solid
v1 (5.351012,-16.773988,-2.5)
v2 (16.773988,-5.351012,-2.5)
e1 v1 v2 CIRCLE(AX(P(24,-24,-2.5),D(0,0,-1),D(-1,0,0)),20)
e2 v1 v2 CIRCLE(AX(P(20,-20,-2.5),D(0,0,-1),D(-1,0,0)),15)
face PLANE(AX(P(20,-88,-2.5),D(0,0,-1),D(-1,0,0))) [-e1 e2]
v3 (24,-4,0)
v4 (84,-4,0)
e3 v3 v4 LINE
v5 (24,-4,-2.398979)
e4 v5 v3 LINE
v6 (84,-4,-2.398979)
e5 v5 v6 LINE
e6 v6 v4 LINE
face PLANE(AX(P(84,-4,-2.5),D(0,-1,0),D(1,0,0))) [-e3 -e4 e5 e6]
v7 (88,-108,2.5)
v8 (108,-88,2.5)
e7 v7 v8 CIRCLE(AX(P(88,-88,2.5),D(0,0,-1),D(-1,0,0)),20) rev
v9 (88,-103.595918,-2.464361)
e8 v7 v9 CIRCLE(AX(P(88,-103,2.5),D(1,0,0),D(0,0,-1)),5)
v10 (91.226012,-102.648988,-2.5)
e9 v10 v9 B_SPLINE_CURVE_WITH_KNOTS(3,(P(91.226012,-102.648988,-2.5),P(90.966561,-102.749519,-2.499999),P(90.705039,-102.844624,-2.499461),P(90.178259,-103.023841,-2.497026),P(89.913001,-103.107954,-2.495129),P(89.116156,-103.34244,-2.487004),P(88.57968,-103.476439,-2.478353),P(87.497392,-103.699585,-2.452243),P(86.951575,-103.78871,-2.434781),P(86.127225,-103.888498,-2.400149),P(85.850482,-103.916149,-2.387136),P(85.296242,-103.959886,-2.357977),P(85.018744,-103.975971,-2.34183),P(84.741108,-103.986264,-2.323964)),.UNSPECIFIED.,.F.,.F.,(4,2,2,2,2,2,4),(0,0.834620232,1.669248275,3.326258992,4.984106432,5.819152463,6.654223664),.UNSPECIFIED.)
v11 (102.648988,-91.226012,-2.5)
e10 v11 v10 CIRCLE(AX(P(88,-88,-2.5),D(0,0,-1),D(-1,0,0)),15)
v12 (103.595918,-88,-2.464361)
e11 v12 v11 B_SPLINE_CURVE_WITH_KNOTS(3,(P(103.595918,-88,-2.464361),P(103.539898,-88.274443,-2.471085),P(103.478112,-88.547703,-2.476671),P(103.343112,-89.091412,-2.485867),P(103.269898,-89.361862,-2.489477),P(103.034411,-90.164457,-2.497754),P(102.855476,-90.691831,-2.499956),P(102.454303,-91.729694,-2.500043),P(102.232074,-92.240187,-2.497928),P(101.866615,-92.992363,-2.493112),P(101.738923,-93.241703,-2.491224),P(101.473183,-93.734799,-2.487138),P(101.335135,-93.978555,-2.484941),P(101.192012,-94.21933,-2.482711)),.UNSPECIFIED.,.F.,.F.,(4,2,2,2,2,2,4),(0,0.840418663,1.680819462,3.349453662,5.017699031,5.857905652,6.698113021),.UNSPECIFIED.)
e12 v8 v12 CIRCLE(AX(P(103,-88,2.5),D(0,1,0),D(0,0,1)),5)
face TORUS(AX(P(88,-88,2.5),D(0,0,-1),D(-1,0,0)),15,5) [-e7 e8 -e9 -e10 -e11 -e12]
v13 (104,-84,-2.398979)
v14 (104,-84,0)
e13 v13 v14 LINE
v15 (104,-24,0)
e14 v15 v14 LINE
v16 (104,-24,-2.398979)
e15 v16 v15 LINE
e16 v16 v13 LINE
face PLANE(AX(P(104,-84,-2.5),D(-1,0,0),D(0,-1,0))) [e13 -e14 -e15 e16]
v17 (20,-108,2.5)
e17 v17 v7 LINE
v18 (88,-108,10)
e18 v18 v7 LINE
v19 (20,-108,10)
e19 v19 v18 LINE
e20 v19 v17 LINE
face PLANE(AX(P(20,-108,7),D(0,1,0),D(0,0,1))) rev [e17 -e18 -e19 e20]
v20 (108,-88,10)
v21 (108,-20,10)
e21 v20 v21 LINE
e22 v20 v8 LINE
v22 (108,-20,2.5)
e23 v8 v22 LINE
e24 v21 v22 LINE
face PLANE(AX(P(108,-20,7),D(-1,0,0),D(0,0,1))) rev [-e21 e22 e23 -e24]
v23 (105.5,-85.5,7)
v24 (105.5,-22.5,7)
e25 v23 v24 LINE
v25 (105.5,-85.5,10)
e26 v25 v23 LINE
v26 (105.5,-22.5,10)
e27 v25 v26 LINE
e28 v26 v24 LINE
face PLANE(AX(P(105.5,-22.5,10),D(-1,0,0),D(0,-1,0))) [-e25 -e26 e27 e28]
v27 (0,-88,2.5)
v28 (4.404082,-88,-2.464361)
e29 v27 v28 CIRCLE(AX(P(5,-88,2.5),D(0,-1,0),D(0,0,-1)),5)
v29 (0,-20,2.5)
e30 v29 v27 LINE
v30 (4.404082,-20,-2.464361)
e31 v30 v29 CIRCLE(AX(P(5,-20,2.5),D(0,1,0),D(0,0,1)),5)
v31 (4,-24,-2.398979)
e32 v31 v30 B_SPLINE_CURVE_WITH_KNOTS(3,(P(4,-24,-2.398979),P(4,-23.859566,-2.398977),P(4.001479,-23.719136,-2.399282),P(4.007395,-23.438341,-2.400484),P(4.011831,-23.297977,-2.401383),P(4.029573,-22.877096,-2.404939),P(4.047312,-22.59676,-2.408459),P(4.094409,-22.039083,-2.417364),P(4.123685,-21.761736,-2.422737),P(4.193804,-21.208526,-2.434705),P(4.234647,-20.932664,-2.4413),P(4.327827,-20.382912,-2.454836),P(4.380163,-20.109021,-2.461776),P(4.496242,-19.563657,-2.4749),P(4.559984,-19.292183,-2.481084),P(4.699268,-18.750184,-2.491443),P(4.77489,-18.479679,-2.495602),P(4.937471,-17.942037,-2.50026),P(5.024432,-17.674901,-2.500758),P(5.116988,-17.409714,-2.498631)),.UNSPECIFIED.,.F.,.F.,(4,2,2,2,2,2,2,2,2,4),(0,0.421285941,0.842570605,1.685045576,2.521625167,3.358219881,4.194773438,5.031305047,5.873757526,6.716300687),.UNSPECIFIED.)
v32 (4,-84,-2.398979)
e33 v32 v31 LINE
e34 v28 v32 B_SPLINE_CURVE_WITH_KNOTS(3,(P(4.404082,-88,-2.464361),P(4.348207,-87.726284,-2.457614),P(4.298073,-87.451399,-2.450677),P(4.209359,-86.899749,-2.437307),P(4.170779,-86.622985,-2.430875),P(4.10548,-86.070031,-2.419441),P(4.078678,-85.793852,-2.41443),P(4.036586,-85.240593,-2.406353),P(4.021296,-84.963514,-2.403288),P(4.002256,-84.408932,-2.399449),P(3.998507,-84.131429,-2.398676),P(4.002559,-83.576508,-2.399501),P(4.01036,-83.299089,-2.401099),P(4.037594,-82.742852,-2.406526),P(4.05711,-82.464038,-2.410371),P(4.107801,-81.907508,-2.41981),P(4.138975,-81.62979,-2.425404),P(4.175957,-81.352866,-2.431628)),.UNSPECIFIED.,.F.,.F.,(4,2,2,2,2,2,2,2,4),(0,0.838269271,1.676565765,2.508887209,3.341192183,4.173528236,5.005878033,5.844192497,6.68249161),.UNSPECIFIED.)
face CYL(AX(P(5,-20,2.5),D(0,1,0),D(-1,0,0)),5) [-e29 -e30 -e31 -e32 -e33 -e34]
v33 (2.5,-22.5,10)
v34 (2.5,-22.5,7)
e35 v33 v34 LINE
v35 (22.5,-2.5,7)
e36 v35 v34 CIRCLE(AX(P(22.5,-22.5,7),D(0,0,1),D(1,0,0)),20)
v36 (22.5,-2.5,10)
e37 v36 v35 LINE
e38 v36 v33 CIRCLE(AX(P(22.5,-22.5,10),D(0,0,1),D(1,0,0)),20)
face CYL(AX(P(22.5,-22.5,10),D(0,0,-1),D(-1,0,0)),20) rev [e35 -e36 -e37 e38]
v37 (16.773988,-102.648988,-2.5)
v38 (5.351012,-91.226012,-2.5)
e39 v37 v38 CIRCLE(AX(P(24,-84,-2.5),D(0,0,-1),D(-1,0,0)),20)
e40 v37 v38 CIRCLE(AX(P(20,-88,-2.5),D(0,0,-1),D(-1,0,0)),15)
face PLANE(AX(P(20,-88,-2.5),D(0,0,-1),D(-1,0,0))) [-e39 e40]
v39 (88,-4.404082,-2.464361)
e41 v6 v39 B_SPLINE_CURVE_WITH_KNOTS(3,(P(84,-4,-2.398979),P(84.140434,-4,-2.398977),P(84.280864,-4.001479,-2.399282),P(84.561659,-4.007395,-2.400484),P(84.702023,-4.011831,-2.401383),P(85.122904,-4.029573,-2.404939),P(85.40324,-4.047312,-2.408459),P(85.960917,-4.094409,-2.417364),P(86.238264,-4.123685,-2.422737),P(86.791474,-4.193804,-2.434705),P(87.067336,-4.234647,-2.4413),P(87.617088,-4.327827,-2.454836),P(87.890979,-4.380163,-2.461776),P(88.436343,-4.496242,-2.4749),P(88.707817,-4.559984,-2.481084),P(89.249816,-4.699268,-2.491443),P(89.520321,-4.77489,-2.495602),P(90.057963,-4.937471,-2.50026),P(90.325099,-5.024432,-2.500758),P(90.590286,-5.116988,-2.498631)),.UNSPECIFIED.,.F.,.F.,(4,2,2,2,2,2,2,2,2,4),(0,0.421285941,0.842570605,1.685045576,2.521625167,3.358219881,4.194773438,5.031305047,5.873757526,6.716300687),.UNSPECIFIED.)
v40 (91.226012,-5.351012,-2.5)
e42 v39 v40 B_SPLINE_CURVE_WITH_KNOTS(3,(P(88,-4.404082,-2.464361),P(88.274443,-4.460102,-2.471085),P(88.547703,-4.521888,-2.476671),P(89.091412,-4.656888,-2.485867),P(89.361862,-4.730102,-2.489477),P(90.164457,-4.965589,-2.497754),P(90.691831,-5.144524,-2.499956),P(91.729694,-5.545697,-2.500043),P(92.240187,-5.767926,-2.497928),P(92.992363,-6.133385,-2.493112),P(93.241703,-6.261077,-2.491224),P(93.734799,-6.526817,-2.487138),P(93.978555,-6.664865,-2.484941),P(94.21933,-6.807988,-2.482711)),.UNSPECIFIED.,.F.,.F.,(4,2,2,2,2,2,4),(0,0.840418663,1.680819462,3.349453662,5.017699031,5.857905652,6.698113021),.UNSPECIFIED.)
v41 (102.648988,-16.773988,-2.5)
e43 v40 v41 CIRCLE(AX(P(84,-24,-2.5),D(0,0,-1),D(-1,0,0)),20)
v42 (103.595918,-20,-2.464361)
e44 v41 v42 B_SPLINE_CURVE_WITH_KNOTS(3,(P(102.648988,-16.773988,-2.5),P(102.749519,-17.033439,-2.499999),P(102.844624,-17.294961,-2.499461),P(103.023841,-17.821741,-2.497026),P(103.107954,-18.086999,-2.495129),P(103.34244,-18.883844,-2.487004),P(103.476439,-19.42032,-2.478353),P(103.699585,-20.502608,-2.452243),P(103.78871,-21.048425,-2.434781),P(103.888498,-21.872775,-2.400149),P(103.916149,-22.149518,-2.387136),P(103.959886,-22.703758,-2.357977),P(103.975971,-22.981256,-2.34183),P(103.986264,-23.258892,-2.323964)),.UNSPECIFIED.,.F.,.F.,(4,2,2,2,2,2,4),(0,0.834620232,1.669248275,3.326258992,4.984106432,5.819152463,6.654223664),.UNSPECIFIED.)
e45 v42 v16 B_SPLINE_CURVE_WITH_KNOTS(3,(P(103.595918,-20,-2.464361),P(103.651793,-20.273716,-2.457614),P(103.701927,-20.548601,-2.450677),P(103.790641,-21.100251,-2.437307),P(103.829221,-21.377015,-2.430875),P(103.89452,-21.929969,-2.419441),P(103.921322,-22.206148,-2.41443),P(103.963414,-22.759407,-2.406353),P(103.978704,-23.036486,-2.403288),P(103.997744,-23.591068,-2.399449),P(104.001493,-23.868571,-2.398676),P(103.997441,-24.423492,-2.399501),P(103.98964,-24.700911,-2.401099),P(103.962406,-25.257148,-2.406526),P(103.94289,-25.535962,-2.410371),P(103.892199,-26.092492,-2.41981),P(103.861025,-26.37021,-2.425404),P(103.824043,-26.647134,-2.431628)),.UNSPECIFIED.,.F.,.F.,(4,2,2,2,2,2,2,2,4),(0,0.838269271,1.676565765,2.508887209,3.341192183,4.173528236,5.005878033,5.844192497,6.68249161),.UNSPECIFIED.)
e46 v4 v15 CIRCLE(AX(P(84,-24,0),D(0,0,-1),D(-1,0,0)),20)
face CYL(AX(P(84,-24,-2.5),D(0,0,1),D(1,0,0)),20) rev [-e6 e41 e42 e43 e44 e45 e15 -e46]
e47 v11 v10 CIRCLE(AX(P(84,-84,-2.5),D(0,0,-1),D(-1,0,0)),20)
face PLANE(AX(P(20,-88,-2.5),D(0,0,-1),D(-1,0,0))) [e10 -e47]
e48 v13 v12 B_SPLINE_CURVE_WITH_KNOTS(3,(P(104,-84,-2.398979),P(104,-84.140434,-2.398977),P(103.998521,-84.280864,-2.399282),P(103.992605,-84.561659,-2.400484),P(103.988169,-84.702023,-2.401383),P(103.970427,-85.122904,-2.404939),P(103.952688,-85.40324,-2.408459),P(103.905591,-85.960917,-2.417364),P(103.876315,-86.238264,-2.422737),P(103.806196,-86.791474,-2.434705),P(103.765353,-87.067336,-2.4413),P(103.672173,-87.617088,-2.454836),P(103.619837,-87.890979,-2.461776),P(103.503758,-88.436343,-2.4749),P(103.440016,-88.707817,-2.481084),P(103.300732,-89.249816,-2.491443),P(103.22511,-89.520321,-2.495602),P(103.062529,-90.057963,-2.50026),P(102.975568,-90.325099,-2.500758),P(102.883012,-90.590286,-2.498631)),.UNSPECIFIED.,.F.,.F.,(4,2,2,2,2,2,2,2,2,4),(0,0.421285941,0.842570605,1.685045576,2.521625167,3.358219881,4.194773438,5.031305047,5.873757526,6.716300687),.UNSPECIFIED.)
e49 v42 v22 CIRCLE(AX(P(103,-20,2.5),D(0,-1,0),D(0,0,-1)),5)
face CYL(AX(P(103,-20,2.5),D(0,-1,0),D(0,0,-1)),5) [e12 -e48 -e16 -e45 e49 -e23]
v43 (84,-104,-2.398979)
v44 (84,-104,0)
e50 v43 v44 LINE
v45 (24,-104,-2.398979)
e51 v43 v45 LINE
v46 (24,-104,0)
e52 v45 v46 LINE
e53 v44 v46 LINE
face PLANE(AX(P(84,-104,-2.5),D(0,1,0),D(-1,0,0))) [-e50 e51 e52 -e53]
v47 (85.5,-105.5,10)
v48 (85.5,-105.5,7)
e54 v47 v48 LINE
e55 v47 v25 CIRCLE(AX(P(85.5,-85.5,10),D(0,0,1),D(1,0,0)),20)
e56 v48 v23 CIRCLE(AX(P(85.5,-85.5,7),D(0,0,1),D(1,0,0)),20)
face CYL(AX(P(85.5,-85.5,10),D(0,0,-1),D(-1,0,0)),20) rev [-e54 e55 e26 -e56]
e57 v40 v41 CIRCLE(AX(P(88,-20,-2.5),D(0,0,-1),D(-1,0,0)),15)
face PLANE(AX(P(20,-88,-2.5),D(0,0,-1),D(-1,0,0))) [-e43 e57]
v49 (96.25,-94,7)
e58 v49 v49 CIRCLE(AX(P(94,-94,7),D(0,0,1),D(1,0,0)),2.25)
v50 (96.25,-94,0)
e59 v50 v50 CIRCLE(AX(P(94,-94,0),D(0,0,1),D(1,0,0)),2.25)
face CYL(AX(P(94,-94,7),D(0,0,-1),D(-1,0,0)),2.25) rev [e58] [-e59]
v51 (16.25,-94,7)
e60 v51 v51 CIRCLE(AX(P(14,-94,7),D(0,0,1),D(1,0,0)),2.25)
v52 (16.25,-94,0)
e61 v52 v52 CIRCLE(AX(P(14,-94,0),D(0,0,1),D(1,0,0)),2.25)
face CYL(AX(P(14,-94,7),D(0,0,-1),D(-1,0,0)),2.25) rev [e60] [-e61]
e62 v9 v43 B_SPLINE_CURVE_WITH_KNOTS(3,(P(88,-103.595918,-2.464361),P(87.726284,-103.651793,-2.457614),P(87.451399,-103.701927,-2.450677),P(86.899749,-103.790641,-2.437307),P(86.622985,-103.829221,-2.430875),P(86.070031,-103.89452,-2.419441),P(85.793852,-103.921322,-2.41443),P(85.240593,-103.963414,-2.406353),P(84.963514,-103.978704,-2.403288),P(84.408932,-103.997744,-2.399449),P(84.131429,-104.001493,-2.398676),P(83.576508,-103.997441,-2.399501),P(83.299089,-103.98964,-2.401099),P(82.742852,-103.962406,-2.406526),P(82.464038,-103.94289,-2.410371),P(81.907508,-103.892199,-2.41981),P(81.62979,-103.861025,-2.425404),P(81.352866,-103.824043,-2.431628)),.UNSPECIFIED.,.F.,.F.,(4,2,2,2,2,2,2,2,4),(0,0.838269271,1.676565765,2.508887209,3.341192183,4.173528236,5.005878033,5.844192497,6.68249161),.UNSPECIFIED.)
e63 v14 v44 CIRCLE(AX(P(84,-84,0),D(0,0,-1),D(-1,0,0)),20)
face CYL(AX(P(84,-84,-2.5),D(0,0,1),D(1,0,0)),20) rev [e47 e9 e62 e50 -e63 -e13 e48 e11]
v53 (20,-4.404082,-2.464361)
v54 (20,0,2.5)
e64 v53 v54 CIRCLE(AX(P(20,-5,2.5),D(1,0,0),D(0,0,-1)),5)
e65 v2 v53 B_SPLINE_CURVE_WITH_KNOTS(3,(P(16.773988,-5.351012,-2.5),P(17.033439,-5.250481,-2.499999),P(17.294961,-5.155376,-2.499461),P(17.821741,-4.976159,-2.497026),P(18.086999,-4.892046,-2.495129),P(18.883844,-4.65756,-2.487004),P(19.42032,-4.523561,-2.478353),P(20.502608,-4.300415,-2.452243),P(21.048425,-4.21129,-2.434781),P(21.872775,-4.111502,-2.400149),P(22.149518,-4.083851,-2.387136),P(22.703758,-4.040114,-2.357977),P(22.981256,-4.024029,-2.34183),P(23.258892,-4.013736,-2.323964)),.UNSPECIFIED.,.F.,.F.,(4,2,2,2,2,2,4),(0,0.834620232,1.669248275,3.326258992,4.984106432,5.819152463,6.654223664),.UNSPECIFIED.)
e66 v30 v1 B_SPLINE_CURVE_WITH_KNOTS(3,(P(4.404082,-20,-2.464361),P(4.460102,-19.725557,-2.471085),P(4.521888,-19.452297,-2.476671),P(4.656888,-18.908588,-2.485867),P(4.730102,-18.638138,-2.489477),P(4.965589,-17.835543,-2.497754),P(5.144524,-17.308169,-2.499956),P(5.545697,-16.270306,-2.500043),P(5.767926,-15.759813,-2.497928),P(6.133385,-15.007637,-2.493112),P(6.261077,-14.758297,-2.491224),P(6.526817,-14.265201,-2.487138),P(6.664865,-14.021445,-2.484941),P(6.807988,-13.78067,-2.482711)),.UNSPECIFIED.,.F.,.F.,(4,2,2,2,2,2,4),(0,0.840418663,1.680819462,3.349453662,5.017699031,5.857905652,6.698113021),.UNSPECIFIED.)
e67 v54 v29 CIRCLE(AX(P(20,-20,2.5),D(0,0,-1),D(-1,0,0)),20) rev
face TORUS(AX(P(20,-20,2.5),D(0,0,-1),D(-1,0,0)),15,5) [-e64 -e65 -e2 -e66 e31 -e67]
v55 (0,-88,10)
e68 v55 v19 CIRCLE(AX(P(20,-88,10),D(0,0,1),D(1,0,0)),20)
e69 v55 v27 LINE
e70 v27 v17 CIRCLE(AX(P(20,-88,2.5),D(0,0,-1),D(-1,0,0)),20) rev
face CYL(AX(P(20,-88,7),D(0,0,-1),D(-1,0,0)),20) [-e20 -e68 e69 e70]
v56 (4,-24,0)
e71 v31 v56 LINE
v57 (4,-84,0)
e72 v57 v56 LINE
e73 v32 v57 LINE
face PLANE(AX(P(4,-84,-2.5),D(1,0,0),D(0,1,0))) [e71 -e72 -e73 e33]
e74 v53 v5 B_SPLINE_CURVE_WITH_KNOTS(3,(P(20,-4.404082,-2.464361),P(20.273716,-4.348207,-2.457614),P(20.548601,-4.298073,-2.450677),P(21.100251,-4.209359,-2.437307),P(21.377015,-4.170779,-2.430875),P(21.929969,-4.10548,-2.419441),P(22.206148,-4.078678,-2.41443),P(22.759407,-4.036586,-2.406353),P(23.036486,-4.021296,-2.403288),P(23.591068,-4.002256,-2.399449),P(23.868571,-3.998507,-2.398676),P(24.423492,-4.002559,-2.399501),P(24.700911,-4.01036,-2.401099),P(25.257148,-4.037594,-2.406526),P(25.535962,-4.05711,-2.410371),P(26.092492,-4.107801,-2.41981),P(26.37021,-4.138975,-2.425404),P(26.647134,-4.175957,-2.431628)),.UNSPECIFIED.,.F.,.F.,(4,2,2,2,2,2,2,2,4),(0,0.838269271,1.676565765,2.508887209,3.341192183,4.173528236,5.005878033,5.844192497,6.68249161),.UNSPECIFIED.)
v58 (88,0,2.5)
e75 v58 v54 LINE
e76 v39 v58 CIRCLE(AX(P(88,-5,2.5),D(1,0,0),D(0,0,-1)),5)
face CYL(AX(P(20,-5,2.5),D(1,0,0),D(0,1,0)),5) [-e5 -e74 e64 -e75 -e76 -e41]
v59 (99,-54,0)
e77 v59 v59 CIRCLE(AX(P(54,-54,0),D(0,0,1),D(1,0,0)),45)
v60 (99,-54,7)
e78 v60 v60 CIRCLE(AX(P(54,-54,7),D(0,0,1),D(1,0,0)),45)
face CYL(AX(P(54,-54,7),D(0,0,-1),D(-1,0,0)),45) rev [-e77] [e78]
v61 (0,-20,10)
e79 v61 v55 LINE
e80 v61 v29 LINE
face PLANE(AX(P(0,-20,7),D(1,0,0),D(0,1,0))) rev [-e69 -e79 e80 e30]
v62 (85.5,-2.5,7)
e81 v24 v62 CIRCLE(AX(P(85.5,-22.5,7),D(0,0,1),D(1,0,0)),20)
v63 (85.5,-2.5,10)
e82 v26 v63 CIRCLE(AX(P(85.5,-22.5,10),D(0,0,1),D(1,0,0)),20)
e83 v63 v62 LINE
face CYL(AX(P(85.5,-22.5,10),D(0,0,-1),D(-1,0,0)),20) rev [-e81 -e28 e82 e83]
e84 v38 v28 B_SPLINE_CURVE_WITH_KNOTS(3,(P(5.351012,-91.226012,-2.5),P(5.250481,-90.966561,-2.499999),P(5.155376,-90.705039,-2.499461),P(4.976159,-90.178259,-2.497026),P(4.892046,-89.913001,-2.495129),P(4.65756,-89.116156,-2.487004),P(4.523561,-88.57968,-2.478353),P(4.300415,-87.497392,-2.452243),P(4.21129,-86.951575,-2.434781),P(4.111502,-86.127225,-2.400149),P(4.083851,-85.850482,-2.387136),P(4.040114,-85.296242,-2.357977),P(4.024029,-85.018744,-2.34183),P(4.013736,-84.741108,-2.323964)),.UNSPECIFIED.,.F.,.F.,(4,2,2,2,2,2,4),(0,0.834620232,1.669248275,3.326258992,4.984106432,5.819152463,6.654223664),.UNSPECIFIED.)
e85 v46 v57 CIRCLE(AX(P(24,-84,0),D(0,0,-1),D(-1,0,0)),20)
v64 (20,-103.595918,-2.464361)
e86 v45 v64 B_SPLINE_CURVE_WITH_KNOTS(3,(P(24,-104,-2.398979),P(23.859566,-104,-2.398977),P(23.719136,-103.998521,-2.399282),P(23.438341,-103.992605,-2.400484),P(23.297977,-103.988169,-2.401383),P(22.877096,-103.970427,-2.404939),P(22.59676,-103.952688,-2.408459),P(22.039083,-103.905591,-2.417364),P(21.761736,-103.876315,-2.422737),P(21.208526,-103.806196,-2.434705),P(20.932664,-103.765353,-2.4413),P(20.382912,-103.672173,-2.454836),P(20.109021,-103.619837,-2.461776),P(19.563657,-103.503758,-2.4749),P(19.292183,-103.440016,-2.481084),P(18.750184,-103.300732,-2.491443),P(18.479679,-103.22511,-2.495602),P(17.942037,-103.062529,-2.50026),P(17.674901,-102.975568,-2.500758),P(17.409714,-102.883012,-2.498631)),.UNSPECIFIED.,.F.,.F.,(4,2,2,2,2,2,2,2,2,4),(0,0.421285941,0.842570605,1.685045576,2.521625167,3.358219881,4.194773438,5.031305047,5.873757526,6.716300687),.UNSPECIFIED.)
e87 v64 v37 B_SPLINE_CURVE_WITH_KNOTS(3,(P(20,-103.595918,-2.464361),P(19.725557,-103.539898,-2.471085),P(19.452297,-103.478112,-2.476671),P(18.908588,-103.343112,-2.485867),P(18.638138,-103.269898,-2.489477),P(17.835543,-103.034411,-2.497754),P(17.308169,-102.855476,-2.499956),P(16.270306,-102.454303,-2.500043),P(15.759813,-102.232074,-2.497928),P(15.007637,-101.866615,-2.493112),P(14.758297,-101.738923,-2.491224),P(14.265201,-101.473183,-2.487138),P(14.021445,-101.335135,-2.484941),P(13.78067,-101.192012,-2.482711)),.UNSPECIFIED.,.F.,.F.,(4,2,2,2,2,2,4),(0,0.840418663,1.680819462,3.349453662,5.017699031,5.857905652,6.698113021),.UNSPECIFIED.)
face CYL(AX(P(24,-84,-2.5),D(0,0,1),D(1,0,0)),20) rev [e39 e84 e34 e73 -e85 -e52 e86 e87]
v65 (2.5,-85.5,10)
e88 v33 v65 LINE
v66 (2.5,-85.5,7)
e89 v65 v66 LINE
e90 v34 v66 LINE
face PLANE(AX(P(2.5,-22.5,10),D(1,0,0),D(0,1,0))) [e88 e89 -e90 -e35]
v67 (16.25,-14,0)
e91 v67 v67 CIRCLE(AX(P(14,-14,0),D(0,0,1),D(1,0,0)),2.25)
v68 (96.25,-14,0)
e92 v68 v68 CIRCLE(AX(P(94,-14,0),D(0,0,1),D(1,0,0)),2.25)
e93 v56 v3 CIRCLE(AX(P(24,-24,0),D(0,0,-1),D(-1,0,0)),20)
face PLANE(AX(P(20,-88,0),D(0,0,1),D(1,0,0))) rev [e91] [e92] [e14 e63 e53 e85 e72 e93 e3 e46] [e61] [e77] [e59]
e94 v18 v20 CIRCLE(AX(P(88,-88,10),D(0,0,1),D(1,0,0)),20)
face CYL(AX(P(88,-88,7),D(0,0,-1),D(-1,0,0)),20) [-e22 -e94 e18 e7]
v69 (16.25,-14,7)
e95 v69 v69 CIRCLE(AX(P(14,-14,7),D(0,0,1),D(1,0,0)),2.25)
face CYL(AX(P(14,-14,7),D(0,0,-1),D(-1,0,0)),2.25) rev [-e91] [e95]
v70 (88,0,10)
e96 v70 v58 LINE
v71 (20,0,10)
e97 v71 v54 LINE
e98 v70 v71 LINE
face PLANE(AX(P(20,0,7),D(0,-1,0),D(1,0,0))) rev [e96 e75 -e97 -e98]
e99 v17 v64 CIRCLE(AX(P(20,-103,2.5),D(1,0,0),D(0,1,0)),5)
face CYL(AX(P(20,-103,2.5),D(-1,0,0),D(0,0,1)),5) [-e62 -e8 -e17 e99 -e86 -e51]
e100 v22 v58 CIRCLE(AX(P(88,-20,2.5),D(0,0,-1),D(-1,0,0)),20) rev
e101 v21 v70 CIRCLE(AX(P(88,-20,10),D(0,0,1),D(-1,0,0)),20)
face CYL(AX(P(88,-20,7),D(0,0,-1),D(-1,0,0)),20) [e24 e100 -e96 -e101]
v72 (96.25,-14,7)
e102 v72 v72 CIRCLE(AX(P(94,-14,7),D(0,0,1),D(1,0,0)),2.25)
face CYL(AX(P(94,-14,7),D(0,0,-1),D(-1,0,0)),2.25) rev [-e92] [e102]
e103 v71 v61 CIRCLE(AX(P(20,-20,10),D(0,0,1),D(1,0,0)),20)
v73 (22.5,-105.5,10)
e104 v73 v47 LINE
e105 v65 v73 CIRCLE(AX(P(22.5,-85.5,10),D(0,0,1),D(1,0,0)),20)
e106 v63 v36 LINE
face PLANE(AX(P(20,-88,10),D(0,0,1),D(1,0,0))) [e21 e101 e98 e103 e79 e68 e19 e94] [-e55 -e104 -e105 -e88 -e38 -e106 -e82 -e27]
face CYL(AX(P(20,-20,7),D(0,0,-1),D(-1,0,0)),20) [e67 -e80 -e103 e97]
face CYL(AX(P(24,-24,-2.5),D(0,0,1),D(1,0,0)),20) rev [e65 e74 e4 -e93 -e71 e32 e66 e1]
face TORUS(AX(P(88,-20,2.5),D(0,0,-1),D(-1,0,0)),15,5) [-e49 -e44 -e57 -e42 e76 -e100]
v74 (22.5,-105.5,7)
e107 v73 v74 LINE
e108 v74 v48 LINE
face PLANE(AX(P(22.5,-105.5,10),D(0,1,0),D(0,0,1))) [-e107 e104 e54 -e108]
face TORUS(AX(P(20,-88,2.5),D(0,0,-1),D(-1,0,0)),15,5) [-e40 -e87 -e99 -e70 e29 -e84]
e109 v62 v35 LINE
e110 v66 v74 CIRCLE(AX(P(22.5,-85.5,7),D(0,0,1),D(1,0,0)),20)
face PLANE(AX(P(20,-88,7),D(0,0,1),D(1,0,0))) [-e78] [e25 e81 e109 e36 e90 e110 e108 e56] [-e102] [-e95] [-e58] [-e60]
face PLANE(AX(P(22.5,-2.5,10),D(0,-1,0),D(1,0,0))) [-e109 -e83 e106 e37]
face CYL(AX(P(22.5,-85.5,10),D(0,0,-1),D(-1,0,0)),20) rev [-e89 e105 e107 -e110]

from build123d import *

# Parameters (mm, degrees)
ESQUISSE1_R        = 45
ESQUISSE1_R_2      = 2.25
BOSS_EXTRU_1_DEPTH = 7
BOSS_EXTRU_2_DEPTH = 3
BOSS_EXTRU_3_START = 2.5
BOSS_EXTRU_3_DEPTH = 2.5
CONG_1_R           = 5


with BuildPart() as part:
    # Esquisse1 → Boss.-Extru.1 (new body)
    with BuildSketch(Plane.XY):
        with BuildLine():
            Line((20, 0), (88, 0))
            ThreePointArc((88, 0), (102.142135624, -5.857864376), (108, -20))
            Line((108, -20), (108, -88))
            ThreePointArc((108, -88), (102.142135624, -102.142135624), (88, -108))
            Line((88, -108), (20, -108))
            ThreePointArc((20, -108), (5.857864376, -102.142135624), (0, -88))
            Line((0, -88), (0, -20))
            ThreePointArc((0, -20), (5.857864376, -5.857864376), (20, 0))
        make_face()
        with Locations((54, -54)):
            Circle(ESQUISSE1_R, mode=Mode.SUBTRACT)
        with Locations((14, -14)):
            Circle(ESQUISSE1_R_2, mode=Mode.SUBTRACT)
        with Locations((94, -14)):
            Circle(ESQUISSE1_R_2, mode=Mode.SUBTRACT)
        with Locations((94, -94)):
            Circle(ESQUISSE1_R_2, mode=Mode.SUBTRACT)
        with Locations((14, -94)):
            Circle(ESQUISSE1_R_2, mode=Mode.SUBTRACT)
    extrude(amount=BOSS_EXTRU_1_DEPTH)

    # Esquisse2 → Boss.-Extru.2 (add)
    with BuildSketch(Plane.XY.offset(7)):
        with BuildLine():
            Line((20, 0), (88, 0))
            ThreePointArc((88, 0), (102.142135624, -5.857864376), (108, -20))
            Line((108, -20), (108, -88))
            ThreePointArc((108, -88), (102.142135624, -102.142135624), (88, -108))
            Line((88, -108), (20, -108))
            ThreePointArc((20, -108), (5.857864376, -102.142135624), (0, -88))
            Line((0, -88), (0, -20))
            ThreePointArc((0, -20), (5.857864376, -5.857864376), (20, 0))
        make_face()
        with BuildLine():
            Line((22.5, -2.5), (85.5, -2.5))
            ThreePointArc((85.5, -2.5), (99.642135624, -8.357864376), (105.5, -22.5))
            Line((105.5, -22.5), (105.5, -85.5))
            ThreePointArc((105.5, -85.5), (99.642135624, -99.642135624), (85.5, -105.5))
            Line((85.5, -105.5), (22.5, -105.5))
            ThreePointArc((22.5, -105.5), (8.357864376, -99.642135624), (2.5, -85.5))
            Line((2.5, -85.5), (2.5, -22.5))
            ThreePointArc((2.5, -22.5), (8.357864376, -8.357864376), (22.5, -2.5))
        make_face(mode=Mode.SUBTRACT)
    extrude(amount=BOSS_EXTRU_2_DEPTH)

    # Esquisse3 → Boss.-Extru.3 (add)
    with BuildSketch(Plane(origin=(0, 0, 0), x_dir=(-1, 0, 0), z_dir=(0, 0, -1)).offset(BOSS_EXTRU_3_START)):
        with BuildLine():
            Line((-20, 0), (-88, 0))
            ThreePointArc((-88, 0), (-102.142135624, -5.857864376), (-108, -20))
            Line((-108, -20), (-108, -88))
            ThreePointArc((-108, -88), (-102.142135624, -102.142135624), (-88, -108))
            Line((-88, -108), (-20, -108))
            ThreePointArc((-20, -108), (-5.857864376, -102.142135624), (0, -88))
            Line((0, -88), (0, -20))
            ThreePointArc((0, -20), (-5.857864376, -5.857864376), (-20, 0))
        make_face()
        with BuildLine():
            Line((-84, -104), (-24, -104))
            ThreePointArc((-24, -104), (-9.857864376, -98.142135624), (-4, -84))
            Line((-4, -84), (-4, -24))
            ThreePointArc((-4, -24), (-9.857864376, -9.857864376), (-24, -4))
            Line((-24, -4), (-84, -4))
            ThreePointArc((-84, -4), (-98.142135624, -9.857864376), (-104, -24))
            Line((-104, -24), (-104, -84))
            ThreePointArc((-104, -84), (-98.142135624, -98.142135624), (-84, -104))
        make_face(mode=Mode.SUBTRACT)
    extrude(amount=-BOSS_EXTRU_3_DEPTH)

    # Congé1
    # the kernel refuses this fillet: 5 mm, written as the material it takes off along each edge
    with BuildSketch(Plane(origin=(88, -88, -2.5), x_dir=(1, 0, 0), z_dir=(0, 1, 0))) as cong_1_piece_1:
        with BuildLine():
            CenterArc((20 - CONG_1_R, -CONG_1_R), CONG_1_R, 0, 90)
            Line((20 - CONG_1_R, 0), (20, 0))
            Line((20, 0), (20, -CONG_1_R))
        make_face()
    revolve(axis=Axis((88, -88, -2.5), (0, 0, -1)), revolution_arc=90, mode=Mode.SUBTRACT)
    with BuildSketch(Plane(origin=(88, -20, -2.5), x_dir=(0, 1, 0), z_dir=(-1, 0, 0))) as cong_1_piece_2:
        with BuildLine():
            CenterArc((20 - CONG_1_R, -CONG_1_R), CONG_1_R, 0, 90)
            Line((20 - CONG_1_R, 0), (20, 0))
            Line((20, 0), (20, -CONG_1_R))
        make_face()
    revolve(axis=Axis((88, -20, -2.5), (0, 0, -1)), revolution_arc=90, mode=Mode.SUBTRACT)
    with BuildSketch(Plane(origin=(20, -20, -2.5), x_dir=(-1, 0, 0), z_dir=(0, -1, 0))) as cong_1_piece_3:
        with BuildLine():
            CenterArc((20 - CONG_1_R, -CONG_1_R), CONG_1_R, 0, 90)
            Line((20, -CONG_1_R), (20, 0))
            Line((20, 0), (20 - CONG_1_R, 0))
        make_face()
    revolve(axis=Axis((20, -20, -2.5), (0, 0, -1)), revolution_arc=90, mode=Mode.SUBTRACT)
    with BuildSketch(Plane(origin=(20, -88, -2.5), x_dir=(0, -1, 0), z_dir=(1, 0, 0))) as cong_1_piece_4:
        with BuildLine():
            CenterArc((20 - CONG_1_R, -CONG_1_R), CONG_1_R, 0, 90)
            Line((20 - CONG_1_R, 0), (20, 0))
            Line((20, 0), (20, -CONG_1_R))
        make_face()
    revolve(axis=Axis((20, -88, -2.5), (0, 0, -1)), revolution_arc=90, mode=Mode.SUBTRACT)
    with BuildSketch(Plane(origin=(88, -108, -2.5), x_dir=(0, 0, 1), z_dir=(-1, 0, 0)), Plane(origin=(0, -88, -2.5), x_dir=(0, 0, 1), z_dir=(0, 1, 0)), Plane(origin=(20, 0, -2.5), x_dir=(0, 0, 1), z_dir=(1, 0, 0)), Plane(origin=(108, -20, -2.5), x_dir=(0, 0, 1), z_dir=(0, -1, 0))) as cong_1_piece_5:
        with BuildLine():
            CenterArc((CONG_1_R, CONG_1_R), CONG_1_R, 180, 90)
            Line((0, CONG_1_R), (0, 0))
            Line((0, 0), (CONG_1_R, 0))
        make_face()
    extrude(amount=68, mode=Mode.SUBTRACT)


solid = part.part
